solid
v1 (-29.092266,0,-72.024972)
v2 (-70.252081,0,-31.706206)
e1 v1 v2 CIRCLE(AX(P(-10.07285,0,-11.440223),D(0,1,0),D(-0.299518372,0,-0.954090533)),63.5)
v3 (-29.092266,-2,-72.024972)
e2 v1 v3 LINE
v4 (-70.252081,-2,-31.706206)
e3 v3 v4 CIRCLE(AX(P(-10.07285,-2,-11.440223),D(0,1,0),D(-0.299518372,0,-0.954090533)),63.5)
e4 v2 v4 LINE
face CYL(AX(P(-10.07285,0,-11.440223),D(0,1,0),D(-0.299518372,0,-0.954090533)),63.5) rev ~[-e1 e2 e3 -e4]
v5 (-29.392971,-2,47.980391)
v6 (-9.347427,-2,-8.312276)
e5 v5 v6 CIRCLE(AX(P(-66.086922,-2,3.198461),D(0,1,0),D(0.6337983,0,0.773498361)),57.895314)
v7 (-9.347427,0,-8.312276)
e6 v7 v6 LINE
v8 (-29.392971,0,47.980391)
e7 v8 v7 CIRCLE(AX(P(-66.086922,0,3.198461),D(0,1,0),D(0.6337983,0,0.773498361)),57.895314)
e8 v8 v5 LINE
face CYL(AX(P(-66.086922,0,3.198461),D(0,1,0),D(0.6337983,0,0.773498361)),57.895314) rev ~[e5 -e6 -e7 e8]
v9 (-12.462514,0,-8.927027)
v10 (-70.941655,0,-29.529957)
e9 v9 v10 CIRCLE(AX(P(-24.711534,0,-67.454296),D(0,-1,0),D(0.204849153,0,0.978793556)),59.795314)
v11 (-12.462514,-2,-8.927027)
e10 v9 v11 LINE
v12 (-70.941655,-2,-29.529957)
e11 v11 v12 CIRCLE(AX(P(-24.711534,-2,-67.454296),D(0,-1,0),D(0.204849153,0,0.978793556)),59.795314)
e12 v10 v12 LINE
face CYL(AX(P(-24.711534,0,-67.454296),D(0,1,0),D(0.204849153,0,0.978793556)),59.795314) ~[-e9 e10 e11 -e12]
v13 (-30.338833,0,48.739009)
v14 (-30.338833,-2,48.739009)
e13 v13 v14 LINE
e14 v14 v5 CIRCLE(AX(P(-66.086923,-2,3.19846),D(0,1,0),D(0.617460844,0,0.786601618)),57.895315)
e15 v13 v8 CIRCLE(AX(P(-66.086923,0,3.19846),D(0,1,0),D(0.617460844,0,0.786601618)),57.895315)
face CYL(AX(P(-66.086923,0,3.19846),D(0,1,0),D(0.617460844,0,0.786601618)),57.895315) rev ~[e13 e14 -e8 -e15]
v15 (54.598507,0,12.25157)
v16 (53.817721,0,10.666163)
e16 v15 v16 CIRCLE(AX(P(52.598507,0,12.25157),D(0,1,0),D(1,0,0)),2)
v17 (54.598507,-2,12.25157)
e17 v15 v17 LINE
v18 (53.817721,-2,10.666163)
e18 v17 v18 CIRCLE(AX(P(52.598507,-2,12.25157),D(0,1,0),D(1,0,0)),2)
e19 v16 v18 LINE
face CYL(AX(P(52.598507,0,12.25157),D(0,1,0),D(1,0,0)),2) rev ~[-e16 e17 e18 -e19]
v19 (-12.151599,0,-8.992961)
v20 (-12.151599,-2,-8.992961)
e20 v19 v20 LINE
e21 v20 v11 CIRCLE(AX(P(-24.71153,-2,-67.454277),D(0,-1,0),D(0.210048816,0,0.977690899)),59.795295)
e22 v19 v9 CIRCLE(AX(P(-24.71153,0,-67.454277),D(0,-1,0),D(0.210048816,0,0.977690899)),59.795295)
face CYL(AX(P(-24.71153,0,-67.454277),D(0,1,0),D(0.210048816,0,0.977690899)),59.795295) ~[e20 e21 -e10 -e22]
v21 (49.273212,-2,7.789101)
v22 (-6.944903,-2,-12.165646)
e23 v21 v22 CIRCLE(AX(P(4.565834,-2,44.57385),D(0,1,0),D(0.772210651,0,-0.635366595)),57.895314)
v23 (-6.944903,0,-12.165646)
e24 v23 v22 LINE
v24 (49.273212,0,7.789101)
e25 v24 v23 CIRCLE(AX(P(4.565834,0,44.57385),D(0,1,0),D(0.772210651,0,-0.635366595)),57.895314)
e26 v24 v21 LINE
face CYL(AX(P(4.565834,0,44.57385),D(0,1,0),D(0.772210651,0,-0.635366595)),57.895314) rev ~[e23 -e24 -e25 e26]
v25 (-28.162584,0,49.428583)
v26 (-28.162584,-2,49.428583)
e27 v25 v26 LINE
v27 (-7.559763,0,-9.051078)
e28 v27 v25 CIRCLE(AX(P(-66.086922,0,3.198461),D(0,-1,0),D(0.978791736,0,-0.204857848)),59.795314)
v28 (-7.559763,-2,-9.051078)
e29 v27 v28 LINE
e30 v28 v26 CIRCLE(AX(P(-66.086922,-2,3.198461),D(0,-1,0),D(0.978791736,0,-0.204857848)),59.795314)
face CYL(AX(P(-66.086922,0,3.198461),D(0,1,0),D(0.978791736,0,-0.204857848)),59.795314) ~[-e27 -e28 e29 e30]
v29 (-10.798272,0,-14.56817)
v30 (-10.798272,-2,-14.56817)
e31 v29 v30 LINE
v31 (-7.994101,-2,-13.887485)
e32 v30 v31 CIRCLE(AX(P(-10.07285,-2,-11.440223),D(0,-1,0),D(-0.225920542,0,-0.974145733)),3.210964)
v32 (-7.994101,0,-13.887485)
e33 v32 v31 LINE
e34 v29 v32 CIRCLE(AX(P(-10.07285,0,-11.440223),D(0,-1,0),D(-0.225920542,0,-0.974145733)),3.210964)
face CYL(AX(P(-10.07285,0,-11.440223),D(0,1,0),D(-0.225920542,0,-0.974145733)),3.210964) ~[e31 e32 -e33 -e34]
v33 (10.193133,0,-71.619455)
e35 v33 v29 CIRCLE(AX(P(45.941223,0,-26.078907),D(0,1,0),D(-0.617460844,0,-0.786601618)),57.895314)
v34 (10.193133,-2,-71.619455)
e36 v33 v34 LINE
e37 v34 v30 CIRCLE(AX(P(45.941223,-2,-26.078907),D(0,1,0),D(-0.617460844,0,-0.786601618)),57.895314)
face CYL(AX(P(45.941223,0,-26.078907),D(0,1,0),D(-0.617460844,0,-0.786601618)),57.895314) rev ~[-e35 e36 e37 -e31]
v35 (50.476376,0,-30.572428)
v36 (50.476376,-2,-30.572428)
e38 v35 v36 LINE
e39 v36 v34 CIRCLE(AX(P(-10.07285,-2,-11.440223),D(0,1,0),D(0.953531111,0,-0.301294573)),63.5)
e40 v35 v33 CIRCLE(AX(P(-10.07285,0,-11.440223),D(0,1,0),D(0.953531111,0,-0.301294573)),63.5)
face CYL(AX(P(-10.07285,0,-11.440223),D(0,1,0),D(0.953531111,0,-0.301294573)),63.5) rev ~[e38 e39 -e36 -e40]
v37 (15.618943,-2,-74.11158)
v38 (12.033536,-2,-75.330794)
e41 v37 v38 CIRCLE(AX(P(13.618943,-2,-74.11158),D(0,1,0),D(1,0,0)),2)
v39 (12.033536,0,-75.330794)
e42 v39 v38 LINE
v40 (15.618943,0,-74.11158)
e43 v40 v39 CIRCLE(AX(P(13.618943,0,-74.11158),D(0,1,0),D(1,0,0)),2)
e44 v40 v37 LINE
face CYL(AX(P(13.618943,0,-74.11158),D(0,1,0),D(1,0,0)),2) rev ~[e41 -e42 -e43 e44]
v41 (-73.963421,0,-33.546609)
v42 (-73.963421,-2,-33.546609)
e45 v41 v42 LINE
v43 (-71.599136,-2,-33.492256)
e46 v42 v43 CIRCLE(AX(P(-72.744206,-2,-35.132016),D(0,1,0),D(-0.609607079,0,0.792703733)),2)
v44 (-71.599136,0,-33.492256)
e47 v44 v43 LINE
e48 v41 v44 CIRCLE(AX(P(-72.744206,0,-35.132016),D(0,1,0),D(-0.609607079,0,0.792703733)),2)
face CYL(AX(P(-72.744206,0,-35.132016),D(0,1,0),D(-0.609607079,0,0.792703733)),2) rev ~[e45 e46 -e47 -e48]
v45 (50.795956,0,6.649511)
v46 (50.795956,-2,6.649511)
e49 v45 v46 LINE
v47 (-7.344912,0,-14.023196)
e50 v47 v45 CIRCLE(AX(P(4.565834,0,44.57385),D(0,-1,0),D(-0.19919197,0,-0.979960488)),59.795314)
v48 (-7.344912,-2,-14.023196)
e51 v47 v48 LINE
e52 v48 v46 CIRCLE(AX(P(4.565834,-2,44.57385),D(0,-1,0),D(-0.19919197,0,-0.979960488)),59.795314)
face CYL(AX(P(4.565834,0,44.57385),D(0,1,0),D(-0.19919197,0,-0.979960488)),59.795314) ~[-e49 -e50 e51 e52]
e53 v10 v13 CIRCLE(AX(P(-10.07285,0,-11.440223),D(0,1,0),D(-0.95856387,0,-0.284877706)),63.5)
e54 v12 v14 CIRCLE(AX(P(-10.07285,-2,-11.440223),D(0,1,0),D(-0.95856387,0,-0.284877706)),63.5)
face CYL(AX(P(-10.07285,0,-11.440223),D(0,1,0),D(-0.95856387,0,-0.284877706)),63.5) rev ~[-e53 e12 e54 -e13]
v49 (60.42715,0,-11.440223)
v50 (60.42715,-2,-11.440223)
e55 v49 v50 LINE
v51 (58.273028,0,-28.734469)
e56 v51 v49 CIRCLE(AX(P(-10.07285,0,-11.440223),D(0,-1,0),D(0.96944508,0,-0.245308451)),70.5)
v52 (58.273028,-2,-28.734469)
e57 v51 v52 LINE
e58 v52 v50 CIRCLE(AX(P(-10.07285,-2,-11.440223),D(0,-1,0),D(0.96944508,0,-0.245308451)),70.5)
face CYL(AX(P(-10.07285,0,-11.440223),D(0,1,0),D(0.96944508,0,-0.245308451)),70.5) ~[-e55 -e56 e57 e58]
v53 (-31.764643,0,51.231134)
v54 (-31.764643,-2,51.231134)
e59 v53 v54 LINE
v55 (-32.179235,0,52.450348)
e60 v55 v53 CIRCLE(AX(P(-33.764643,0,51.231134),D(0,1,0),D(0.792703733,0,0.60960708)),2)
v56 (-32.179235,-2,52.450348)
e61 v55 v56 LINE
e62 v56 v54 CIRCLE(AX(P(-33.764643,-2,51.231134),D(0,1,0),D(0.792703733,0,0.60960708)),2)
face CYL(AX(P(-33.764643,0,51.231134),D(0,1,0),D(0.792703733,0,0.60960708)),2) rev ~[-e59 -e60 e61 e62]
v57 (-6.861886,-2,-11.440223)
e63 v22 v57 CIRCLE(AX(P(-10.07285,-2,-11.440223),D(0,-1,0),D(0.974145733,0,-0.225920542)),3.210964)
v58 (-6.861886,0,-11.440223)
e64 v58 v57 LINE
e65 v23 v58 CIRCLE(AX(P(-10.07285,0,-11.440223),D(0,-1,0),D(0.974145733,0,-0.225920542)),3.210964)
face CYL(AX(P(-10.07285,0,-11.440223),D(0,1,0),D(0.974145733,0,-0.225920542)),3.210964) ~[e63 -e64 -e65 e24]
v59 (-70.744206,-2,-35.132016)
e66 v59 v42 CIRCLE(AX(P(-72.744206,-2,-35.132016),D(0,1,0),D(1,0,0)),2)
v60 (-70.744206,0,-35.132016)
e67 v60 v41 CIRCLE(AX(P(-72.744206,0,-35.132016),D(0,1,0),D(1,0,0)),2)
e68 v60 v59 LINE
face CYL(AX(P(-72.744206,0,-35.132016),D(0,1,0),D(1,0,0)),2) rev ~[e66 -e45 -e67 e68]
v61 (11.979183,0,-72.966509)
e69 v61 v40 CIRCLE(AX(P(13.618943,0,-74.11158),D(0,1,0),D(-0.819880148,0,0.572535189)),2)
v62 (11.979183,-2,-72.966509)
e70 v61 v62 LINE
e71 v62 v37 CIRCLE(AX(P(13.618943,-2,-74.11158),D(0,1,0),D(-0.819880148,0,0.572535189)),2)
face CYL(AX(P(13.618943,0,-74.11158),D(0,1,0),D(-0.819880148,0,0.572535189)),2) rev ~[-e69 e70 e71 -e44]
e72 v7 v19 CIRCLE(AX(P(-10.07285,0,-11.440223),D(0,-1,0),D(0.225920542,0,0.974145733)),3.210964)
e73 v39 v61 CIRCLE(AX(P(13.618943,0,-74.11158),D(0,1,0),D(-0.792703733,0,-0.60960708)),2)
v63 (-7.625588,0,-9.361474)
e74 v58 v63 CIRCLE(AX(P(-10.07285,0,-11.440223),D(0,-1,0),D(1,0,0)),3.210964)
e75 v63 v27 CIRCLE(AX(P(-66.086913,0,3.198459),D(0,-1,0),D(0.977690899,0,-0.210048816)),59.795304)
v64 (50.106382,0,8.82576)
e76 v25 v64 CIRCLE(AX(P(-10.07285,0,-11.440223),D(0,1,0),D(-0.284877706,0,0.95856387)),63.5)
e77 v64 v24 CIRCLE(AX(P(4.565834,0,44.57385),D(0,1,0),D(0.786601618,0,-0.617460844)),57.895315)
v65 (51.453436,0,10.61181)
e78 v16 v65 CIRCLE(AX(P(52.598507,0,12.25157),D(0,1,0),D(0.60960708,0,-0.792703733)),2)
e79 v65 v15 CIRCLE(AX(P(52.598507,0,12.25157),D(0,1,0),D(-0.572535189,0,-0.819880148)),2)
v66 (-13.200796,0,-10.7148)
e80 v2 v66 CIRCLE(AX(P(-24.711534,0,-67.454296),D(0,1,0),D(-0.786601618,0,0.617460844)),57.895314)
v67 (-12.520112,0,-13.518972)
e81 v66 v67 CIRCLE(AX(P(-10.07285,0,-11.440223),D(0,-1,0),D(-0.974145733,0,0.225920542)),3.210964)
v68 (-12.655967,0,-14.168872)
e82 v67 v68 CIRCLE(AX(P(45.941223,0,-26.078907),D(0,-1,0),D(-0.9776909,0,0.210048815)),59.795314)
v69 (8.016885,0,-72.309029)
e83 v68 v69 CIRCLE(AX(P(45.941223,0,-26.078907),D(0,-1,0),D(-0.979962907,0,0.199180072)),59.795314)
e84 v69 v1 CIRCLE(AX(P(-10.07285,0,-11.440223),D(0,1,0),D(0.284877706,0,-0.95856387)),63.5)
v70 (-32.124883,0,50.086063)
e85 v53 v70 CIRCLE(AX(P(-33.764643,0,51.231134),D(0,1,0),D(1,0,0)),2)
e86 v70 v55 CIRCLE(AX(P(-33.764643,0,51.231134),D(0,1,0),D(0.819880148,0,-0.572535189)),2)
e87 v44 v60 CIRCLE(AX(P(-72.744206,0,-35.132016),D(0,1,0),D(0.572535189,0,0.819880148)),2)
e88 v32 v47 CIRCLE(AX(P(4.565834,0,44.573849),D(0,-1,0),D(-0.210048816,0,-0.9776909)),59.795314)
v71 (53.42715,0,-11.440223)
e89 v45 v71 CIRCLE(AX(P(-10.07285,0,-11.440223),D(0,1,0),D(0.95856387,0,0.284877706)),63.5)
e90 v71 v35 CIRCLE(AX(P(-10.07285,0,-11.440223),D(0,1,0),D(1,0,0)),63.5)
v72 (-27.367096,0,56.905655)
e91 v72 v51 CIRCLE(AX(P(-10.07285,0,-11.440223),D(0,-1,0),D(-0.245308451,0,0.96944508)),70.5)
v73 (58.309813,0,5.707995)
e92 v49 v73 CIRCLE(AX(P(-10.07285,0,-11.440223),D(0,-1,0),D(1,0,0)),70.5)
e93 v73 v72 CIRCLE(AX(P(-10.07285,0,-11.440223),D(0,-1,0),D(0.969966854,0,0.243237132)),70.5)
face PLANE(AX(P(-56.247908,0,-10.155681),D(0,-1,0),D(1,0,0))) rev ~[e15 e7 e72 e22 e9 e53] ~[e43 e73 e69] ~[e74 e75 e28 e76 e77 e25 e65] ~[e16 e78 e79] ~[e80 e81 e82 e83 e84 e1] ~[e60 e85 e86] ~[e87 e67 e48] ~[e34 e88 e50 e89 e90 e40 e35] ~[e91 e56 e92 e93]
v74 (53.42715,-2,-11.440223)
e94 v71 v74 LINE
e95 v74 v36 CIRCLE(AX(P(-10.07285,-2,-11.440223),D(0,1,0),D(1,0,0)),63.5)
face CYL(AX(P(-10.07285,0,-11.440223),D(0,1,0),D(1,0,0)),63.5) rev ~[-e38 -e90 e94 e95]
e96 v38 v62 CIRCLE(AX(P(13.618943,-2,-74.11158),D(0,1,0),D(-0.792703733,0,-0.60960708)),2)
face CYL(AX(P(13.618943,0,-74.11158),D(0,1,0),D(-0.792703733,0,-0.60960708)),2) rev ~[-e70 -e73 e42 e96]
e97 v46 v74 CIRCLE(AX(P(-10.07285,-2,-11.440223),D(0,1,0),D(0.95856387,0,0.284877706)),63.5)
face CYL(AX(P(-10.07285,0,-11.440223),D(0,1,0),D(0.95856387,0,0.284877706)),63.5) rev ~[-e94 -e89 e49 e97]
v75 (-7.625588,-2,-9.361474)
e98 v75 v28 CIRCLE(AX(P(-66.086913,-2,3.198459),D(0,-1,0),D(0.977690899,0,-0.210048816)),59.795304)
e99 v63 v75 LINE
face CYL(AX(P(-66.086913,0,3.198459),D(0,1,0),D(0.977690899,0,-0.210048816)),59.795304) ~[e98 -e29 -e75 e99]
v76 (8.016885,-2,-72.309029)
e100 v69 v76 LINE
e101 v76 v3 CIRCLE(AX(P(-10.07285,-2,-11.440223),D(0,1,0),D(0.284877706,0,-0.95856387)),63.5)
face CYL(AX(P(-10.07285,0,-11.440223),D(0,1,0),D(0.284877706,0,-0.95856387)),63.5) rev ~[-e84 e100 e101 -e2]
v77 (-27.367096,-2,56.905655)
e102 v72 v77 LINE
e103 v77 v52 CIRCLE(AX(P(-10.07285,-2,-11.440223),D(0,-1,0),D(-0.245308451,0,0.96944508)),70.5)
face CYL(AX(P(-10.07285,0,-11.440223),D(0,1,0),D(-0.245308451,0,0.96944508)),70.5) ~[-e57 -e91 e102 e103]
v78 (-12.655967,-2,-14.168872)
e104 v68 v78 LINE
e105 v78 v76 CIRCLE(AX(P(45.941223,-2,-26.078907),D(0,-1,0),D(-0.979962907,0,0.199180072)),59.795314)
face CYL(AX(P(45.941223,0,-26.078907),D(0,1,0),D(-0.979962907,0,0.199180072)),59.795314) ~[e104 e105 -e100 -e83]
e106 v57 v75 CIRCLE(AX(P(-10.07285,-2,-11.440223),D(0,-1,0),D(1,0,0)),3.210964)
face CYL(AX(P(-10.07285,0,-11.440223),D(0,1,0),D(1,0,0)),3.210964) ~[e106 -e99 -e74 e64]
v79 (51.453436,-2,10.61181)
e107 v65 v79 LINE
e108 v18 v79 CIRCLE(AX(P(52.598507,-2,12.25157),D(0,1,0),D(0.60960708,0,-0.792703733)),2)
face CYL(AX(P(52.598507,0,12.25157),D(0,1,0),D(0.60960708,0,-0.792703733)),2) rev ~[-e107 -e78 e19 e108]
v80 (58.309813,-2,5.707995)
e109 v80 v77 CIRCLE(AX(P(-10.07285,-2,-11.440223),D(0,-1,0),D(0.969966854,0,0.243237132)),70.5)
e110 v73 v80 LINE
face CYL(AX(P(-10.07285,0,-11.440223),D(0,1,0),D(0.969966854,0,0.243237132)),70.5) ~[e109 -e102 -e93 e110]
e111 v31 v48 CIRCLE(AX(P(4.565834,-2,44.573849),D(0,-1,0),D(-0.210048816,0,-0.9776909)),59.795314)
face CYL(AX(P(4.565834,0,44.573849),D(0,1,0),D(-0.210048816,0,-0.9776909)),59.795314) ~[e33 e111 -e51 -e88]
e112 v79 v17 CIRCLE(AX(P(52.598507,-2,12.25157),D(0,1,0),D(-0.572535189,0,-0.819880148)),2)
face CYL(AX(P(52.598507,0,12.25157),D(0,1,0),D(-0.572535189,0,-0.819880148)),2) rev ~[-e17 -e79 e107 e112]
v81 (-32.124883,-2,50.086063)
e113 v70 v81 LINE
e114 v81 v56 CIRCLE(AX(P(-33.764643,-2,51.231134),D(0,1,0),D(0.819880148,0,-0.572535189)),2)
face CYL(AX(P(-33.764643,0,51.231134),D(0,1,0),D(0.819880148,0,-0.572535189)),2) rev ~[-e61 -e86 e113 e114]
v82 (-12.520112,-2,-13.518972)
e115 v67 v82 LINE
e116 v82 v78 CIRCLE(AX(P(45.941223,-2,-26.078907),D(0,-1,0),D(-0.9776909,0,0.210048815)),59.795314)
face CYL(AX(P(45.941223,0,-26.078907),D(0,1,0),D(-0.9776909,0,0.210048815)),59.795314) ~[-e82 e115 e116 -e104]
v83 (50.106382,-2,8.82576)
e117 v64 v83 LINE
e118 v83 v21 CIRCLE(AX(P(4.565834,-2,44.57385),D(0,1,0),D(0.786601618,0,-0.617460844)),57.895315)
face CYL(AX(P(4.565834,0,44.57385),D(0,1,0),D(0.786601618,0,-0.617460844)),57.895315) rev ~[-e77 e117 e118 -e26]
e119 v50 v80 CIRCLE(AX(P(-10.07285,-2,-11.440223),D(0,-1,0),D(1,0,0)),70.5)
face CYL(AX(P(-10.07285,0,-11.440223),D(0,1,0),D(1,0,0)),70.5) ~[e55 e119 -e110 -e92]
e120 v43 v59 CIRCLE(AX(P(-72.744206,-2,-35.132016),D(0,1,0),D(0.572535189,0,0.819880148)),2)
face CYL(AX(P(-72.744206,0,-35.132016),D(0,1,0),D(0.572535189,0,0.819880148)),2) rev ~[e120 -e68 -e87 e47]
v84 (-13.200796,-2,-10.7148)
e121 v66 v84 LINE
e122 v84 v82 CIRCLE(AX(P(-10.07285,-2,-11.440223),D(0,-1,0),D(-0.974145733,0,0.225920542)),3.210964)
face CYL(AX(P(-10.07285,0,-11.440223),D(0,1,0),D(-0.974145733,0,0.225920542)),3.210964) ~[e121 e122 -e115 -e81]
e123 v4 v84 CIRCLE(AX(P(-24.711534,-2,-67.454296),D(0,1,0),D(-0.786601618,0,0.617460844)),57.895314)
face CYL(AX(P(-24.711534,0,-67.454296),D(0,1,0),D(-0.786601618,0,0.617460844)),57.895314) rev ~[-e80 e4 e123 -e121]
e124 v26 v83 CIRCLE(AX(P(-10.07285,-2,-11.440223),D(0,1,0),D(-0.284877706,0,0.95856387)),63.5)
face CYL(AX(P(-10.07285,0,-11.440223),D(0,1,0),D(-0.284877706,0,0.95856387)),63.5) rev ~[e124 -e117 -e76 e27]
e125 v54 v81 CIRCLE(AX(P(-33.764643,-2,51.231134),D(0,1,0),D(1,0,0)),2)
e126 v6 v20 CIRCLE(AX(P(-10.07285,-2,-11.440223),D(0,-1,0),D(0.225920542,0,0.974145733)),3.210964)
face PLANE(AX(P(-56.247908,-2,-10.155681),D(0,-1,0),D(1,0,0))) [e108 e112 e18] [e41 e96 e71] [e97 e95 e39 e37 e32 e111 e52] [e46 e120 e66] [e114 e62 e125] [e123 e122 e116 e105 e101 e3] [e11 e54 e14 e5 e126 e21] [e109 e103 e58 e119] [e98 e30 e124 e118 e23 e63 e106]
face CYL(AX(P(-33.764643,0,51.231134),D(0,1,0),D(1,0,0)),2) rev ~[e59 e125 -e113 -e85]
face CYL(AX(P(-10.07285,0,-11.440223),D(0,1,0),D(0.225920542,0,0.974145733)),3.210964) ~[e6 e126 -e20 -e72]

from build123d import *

# Parameters (mm, degrees)
F1_DEPTH = 2


# Not quite as in the source:
# - a feature names something its author has since deleted; it is built from what else it names


with BuildPart() as f1:
    # F0 (on Front) → F1 (new body)
    with BuildSketch(Plane.XZ):
        with BuildLine():
            ThreePointArc((-27.3670955133, 56.9056551345), (-80.5728095325, -11.5155179666), (-27.2210675465, -79.822886236))
            ThreePointArc((-27.2210675465, -79.822886236), (-28.2707166424, -75.9512965825), (-29.0922663621, -72.0249718726))
            ThreePointArc((-29.0922663621, -72.0249718726), (-54.5082769695, -56.802573142), (-70.2520814599, -31.7062061045))
            ThreePointArc((-70.2520814599, -31.7062061045), (-70.6313699985, -32.1947433172), (-71.0054179832, -32.6873044899))
            ThreePointArc((-71.0054179832, -32.6873044899), (-70.0780888504, -33.7565825815), (-69.7442063574, -35.1320161272))
            ThreePointArc((-69.7442063574, -35.1320161272), (-74.7859973818, -37.3299900608), (-72.9649326324, -32.1401471609))
            ThreePointArc((-72.9649326324, -32.1401471609), (-71.9713178078, -30.821081237), (-70.9416554734, -29.5299573821))
            ThreePointArc((-70.9416554734, -29.5299573821), (-66.4396950536, 17.8006515976), (-30.3388328071, 48.7390086816))
            ThreePointArc((-30.3388328071, 48.7390086816), (-30.8273700198, 49.1182972202), (-31.3199311925, 49.4923452049))
            ThreePointArc((-31.3199311925, 49.4923452049), (-36.6541110474, 52.0379628175), (-30.7727738636, 51.4518598542))
            ThreePointArc((-30.7727738636, 51.4518598542), (-29.8904735112, 50.7935939017), (-29.0204405195, 50.1191974536))
            ThreePointArc((-29.0204405195, 50.1191974536), (-28.2798956872, 53.5334090749), (-27.3670955133, 56.9056551345))
        make_face()
        with BuildLine():
            ThreePointArc((-29.0922663621, -72.0249718726), (-28.2707166424, -75.9512965825), (-27.2210675465, -79.822886236))
            ThreePointArc((-27.2210675465, -79.822886236), (26.0907604983, -71.958346724), (58.2730284319, -28.7344688106))
            ThreePointArc((58.2730284319, -28.7344688106), (54.4014575958, -29.7669456779), (50.4763758376, -30.5724283969))
            ThreePointArc((50.4763758376, -30.5724283969), (35.2481065637, -55.9178682056), (10.1931333262, -71.6194547573))
            ThreePointArc((10.1931333262, -71.6194547573), (10.6816705389, -71.9987432958), (11.1742317116, -72.3727912805))
            ThreePointArc((11.1742317116, -72.3727912805), (14.5315947304, -71.2537714989), (16.6189433489, -74.1115796548))
            ThreePointArc((16.6189433489, -74.1115796548), (13.7293813431, -77.1095462072), (10.6270743826, -74.3323059298))
            ThreePointArc((10.6270743826, -74.3323059298), (9.3080084587, -73.3386911051), (8.0168846038, -72.3090287708))
            ThreePointArc((8.0168846038, -72.3090287708), (-10.5589046392, -74.9383627794), (-29.0922663621, -72.0249718726))
        make_face()
        with BuildLine():
            ThreePointArc((58.3098134577, 5.7079947682), (26.0907604983, 49.0779006484), (-27.3670955133, 56.9056551345))
            ThreePointArc((-27.3670955133, 56.9056551345), (-28.2798956872, 53.5334090749), (-29.0204405195, 50.1191974536))
            ThreePointArc((-29.0204405195, 50.1191974536), (-28.589922312, 49.7758651019), (-28.1625840847, 49.4285826951))
            ThreePointArc((-28.1625840847, 49.4285826951), (19.1680248949, 44.9266222753), (50.106381979, 8.8257600288))
            ThreePointArc((50.106381979, 8.8257600288), (50.4856705176, 9.3142972415), (50.8597185023, 9.8068584143))
            ThreePointArc((50.8597185023, 9.8068584143), (51.2230733308, 14.9176875586), (55.5985068765, 12.2515700516))
            ThreePointArc((55.5985068765, 12.2515700516), (54.79648081, 10.2097790271), (52.8192331515, 9.2597010853))
            ThreePointArc((52.8192331515, 9.2597010853), (52.1241754763, 8.329073827), (51.4111721259, 7.4121231804))
            ThreePointArc((51.4111721259, 7.4121231804), (54.8825742735, 6.6494490821), (58.3098134577, 5.7079947682))
        make_face()
        with BuildLine():
            ThreePointArc((50.4763758376, -30.5724283969), (54.4014575958, -29.7669456779), (58.2730284319, -28.7344688106))
            ThreePointArc((58.2730284319, -28.7344688106), (59.886547095, -20.1541655683), (60.4271502595, -11.4402230378))
            ThreePointArc((60.4271502595, -11.4402230378), (59.8958138007, -2.8010030346), (58.3098134577, 5.7079947682))
            ThreePointArc((58.3098134577, 5.7079947682), (54.8825742735, 6.6494490821), (51.4111721259, 7.4121231804))
            ThreePointArc((51.4111721259, 7.4121231804), (51.1051261442, 7.0295570743), (50.7959559925, 6.6495113064))
            ThreePointArc((50.7959559925, 6.6495113064), (52.7659088566, -2.3001782907), (53.4271502595, -11.4402230378))
            ThreePointArc((53.4271502595, -11.4402230378), (52.6851211645, -21.1194320912), (50.4763758376, -30.5724283969))
        make_face()
        with BuildLine():
            ThreePointArc((-12.5201116119, -13.51897209), (-12.5889413468, -13.8437334785), (-12.6559669985, -14.1688719933))
            ThreePointArc((-12.6559669985, -14.1688719933), (-12.4731783685, -13.96568891), (-12.2895816621, -13.7632357104))
            ThreePointArc((-12.2895816621, -13.7632357104), (-12.4080426029, -13.6441201736), (-12.5201116119, -13.51897209))
        make_face()
        with BuildLine():
            ThreePointArc((-12.2895816621, -13.7632357104), (-12.4731783685, -13.96568891), (-12.6559669985, -14.1688719933))
            ThreePointArc((-12.6559669985, -14.1688719933), (-10.3985570941, -46.1115999582), (8.0168846038, -72.3090287708))
            ThreePointArc((8.0168846038, -72.3090287708), (9.1081080721, -71.9740223354), (10.1931333262, -71.6194547573))
            ThreePointArc((10.1931333262, -71.6194547573), (-8.3929341527, -46.0705747238), (-10.7982724135, -14.5681696862))
            ThreePointArc((-10.7982724135, -14.5681696862), (-11.5979884526, -14.2658628235), (-12.2895816621, -13.7632357104))
        make_face()
        with BuildLine():
            ThreePointArc((-70.9416554734, -29.5299573821), (-70.606649038, -30.6211808503), (-70.2520814599, -31.7062061045))
            ThreePointArc((-70.2520814599, -31.7062061045), (-44.7032014264, -13.1201386255), (-13.2007963888, -10.7148003648))
            ThreePointArc((-13.2007963888, -10.7148003648), (-12.862086438, -9.8494851792), (-12.2897757069, -9.1173955477))
            ThreePointArc((-12.2897757069, -9.1173955477), (-12.3762338407, -9.022292149), (-12.4625142647, -8.9270274978))
            ThreePointArc((-12.4625142647, -8.9270274978), (-44.5810834921, -11.0567727884), (-70.9416554734, -29.5299573821))
        make_face()
        with BuildLine():
            ThreePointArc((-71.0054179832, -32.6873044899), (-70.6313699985, -32.1947433172), (-70.2520814599, -31.7062061045))
            ThreePointArc((-70.2520814599, -31.7062061045), (-70.606649038, -30.6211808503), (-70.9416554734, -29.5299573821))
            ThreePointArc((-70.9416554734, -29.5299573821), (-71.9713178078, -30.821081237), (-72.9649326324, -32.1401471609))
            ThreePointArc((-72.9649326324, -32.1401471609), (-71.937377119, -32.2425479097), (-71.0054179832, -32.6873044899))
        make_face()
        with BuildLine():
            ThreePointArc((10.1931333262, -71.6194547573), (9.1081080721, -71.9740223354), (8.0168846038, -72.3090287708))
            ThreePointArc((8.0168846038, -72.3090287708), (9.3080084587, -73.3386911051), (10.6270743826, -74.3323059298))
            ThreePointArc((10.6270743826, -74.3323059298), (10.7294751314, -73.3047504164), (11.1742317116, -72.3727912805))
            ThreePointArc((11.1742317116, -72.3727912805), (10.6816705389, -71.9987432958), (10.1931333262, -71.6194547573))
        make_face()
        with BuildLine():
            ThreePointArc((-28.1625840847, 49.4285826951), (-28.589922312, 49.7758651019), (-29.0204405195, 50.1191974536))
            ThreePointArc((-29.0204405195, 50.1191974536), (-29.1146314874, 49.6144442417), (-29.2050550996, 49.1090025402))
            ThreePointArc((-29.2050550996, 49.1090025402), (-28.6845055424, 49.2710301885), (-28.1625840847, 49.4285826951))
        make_face()
        with BuildLine():
            ThreePointArc((-29.2050550996, 49.1090025402), (-29.1146314874, 49.6144442417), (-29.0204405195, 50.1191974536))
            ThreePointArc((-29.0204405195, 50.1191974536), (-29.8904735112, 50.7935939017), (-30.7727738636, 51.4518598542))
            ThreePointArc((-30.7727738636, 51.4518598542), (-30.7666762774, 51.3415715733), (-30.7646428299, 51.2311335791))
            ThreePointArc((-30.7646428299, 51.2311335791), (-30.9068346739, 50.3184821977), (-31.3199311925, 49.4923452049))
            ThreePointArc((-31.3199311925, 49.4923452049), (-30.8273700198, 49.1182972202), (-30.3388328071, 48.7390086816))
            ThreePointArc((-30.3388328071, 48.7390086816), (-29.7728126001, 48.9266674182), (-29.2050550996, 49.1090025402))
        make_face()
        with BuildLine():
            ThreePointArc((50.7959559925, 6.6495113064), (51.1051261442, 7.0295570743), (51.4111721259, 7.4121231804))
            ThreePointArc((51.4111721259, 7.4121231804), (50.9618140768, 7.4971572567), (50.5118990943, 7.5791935838))
            ThreePointArc((50.5118990943, 7.5791935838), (50.6557066113, 7.1148960249), (50.7959559925, 6.6495113064))
        make_face()
        with BuildLine():
            ThreePointArc((50.5118990943, 7.5791935838), (50.9618140768, 7.4971572567), (51.4111721259, 7.4121231804))
            ThreePointArc((51.4111721259, 7.4121231804), (52.1241754763, 8.329073827), (52.8192331515, 9.2597010853))
            ThreePointArc((52.8192331515, 9.2597010853), (51.7916776381, 9.362101834), (50.8597185023, 9.8068584143))
            ThreePointArc((50.8597185023, 9.8068584143), (50.4856705176, 9.3142972415), (50.106381979, 8.8257600288))
            ThreePointArc((50.106381979, 8.8257600288), (50.3123573205, 8.2035232495), (50.5118990943, 7.5791935838))
        make_face()
        with BuildLine():
            ThreePointArc((-12.5201116119, -13.51897209), (-12.4080426029, -13.6441201736), (-12.2895816621, -13.7632357104))
            ThreePointArc((-12.2895816621, -13.7632357104), (-11.1948099524, -12.5887570771), (-10.0728497405, -11.4402230378))
            ThreePointArc((-10.0728497405, -11.4402230378), (-10.9940718567, -11.2075300608), (-11.9189886514, -10.9899866588))
            ThreePointArc((-11.9189886514, -10.9899866588), (-12.2332943861, -12.2512124569), (-12.5201116119, -13.51897209))
        make_face()
        with BuildLine():
            ThreePointArc((-10.0728497405, -11.4402230378), (-11.1948099524, -12.5887570771), (-12.2895816621, -13.7632357104))
            ThreePointArc((-12.2895816621, -13.7632357104), (-11.5979884526, -14.2658628235), (-10.7982724135, -14.5681696862))
            ThreePointArc((-10.7982724135, -14.5681696862), (-10.6643076305, -13.9264868582), (-10.5230861195, -13.2863619488))
            ThreePointArc((-10.5230861195, -13.2863619488), (-10.5381735464, -13.2824253135), (-10.5532599463, -13.2784847442))
            Line((-10.5532599463, -13.2784847442), (-10.0728497405, -11.4402230378))
        make_face()
        with BuildLine():
            ThreePointArc((-13.2007963888, -10.7148003648), (-13.1931994446, -12.1976568722), (-12.5201116119, -13.51897209))
            ThreePointArc((-12.5201116119, -13.51897209), (-12.2332943861, -12.2512124569), (-11.9189886514, -10.9899866588))
            ThreePointArc((-11.9189886514, -10.9899866588), (-12.5591135608, -10.8487651478), (-13.2007963888, -10.7148003648))
        make_face()
        with BuildLine():
            ThreePointArc((-12.2897757069, -9.1173955477), (-12.862086438, -9.8494851792), (-13.2007963888, -10.7148003648))
            ThreePointArc((-13.2007963888, -10.7148003648), (-12.5591135608, -10.8487651478), (-11.9189886514, -10.9899866588))
            ThreePointArc((-11.9189886514, -10.9899866588), (-11.9150520162, -10.9748992319), (-11.9111114468, -10.9598128319))
            Line((-11.9111114468, -10.9598128319), (-10.0728497405, -11.4402230378))
            ThreePointArc((-10.0728497405, -11.4402230378), (-11.1948573752, -10.2917364213), (-12.2897757069, -9.1173955477))
        make_face()
        with BuildLine():
            ThreePointArc((-69.7442063574, -35.1320161272), (-70.0780888504, -33.7565825815), (-71.0054179832, -32.6873044899))
            ThreePointArc((-71.0054179832, -32.6873044899), (-71.3040153489, -33.088497971), (-71.5991359801, -33.4922558304))
            ThreePointArc((-71.5991359801, -33.4922558304), (-70.9707717301, -34.2073920832), (-70.7442063574, -35.1320161272))
            ThreePointArc((-70.7442063574, -35.1320161272), (-73.6278272269, -36.9262329923), (-73.9634205165, -33.5466086609))
            ThreePointArc((-73.9634205165, -33.5466086609), (-73.469248174, -32.839777435), (-72.9649326324, -32.1401471609))
            ThreePointArc((-72.9649326324, -32.1401471609), (-74.7859973818, -37.3299900608), (-69.7442063574, -35.1320161272))
        make_face()
        with BuildLine():
            ThreePointArc((-71.5991359801, -33.4922558304), (-71.3040153489, -33.088497971), (-71.0054179832, -32.6873044899))
            ThreePointArc((-71.0054179832, -32.6873044899), (-71.937377119, -32.2425479097), (-72.9649326324, -32.1401471609))
            ThreePointArc((-72.9649326324, -32.1401471609), (-73.469248174, -32.839777435), (-73.9634205165, -33.5466086609))
            ThreePointArc((-73.9634205165, -33.5466086609), (-72.7901724606, -33.1325444177), (-71.5991359801, -33.4922558304))
        make_face()
        with BuildLine():
            ThreePointArc((11.1742317116, -72.3727912805), (10.7294751314, -73.3047504164), (10.6270743826, -74.3323059298))
            ThreePointArc((10.6270743826, -74.3323059298), (11.3267046567, -74.8366214714), (12.0335358826, -75.3307938138))
            ThreePointArc((12.0335358826, -75.3307938138), (11.6194716394, -74.1575457579), (11.9791830521, -72.9665092775))
            ThreePointArc((11.9791830521, -72.9665092775), (11.5754251927, -72.6713886463), (11.1742317116, -72.3727912805))
        make_face()
        with BuildLine():
            ThreePointArc((12.0335358826, -75.3307938138), (11.3267046567, -74.8366214714), (10.6270743826, -74.3323059298))
            ThreePointArc((10.6270743826, -74.3323059298), (13.7293813431, -77.1095462072), (16.6189433489, -74.1115796548))
            ThreePointArc((16.6189433489, -74.1115796548), (14.5315947304, -71.2537714989), (11.1742317116, -72.3727912805))
            ThreePointArc((11.1742317116, -72.3727912805), (11.5754251927, -72.6713886463), (11.9791830521, -72.9665092775))
            ThreePointArc((11.9791830521, -72.9665092775), (14.2191430683, -72.2037640723), (15.6189433489, -74.1115796548))
            ThreePointArc((15.6189433489, -74.1115796548), (14.2628319524, -76.0050968758), (12.0335358826, -75.3307938138))
        make_face()
        with BuildLine():
            ThreePointArc((-28.1625840847, 49.4285826951), (-28.6845055424, 49.2710301885), (-29.2050550996, 49.1090025402))
            ThreePointArc((-29.2050550996, 49.1090025402), (-29.3013575877, 48.545087408), (-29.3929706411, 47.9803914774))
            ThreePointArc((-29.3929706411, 47.9803914774), (-11.5464019221, 22.6200733478), (-9.3474270674, -8.3122763895))
            ThreePointArc((-9.3474270674, -8.3122763895), (-8.4819953839, -8.6510527838), (-7.7498370678, -9.2234911162))
            ThreePointArc((-7.7498370678, -9.2234911162), (-7.6548806672, -9.1371958925), (-7.5597630163, -9.051078437))
            ThreePointArc((-7.5597630163, -9.051078437), (-9.6893112365, 23.0677602114), (-28.1625840847, 49.4285826951))
        make_face()
        with BuildLine():
            ThreePointArc((-29.3929706411, 47.9803914774), (-29.3013575877, 48.545087408), (-29.2050550996, 49.1090025402))
            ThreePointArc((-29.2050550996, 49.1090025402), (-29.7728126001, 48.9266674182), (-30.3388328071, 48.7390086816))
            ThreePointArc((-30.3388328071, 48.7390086816), (-29.8639157079, 48.3621762923), (-29.3929706411, 47.9803914774))
        make_face()
        with BuildLine():
            ThreePointArc((-30.7646428299, 51.2311335791), (-30.7666762774, 51.3415715733), (-30.7727738636, 51.4518598542))
            ThreePointArc((-30.7727738636, 51.4518598542), (-31.4724041376, 51.9561753958), (-32.1792353635, 52.4503477382))
            ThreePointArc((-32.1792353635, 52.4503477382), (-31.8711256088, 51.8750221826), (-31.7646428299, 51.2311335791))
            ThreePointArc((-31.7646428299, 51.2311335791), (-31.8568272474, 50.6309338597), (-32.124882533, 50.0860632018))
            ThreePointArc((-32.124882533, 50.0860632018), (-31.7211246736, 49.7909425706), (-31.3199311925, 49.4923452049))
            ThreePointArc((-31.3199311925, 49.4923452049), (-30.9068346739, 50.3184821977), (-30.7646428299, 51.2311335791))
        make_face()
        with BuildLine():
            ThreePointArc((-32.1792353635, 52.4503477382), (-31.4724041376, 51.9561753958), (-30.7727738636, 51.4518598542))
            ThreePointArc((-30.7727738636, 51.4518598542), (-36.6541110474, 52.0379628175), (-31.3199311925, 49.4923452049))
            ThreePointArc((-31.3199311925, 49.4923452049), (-31.7211246736, 49.7909425706), (-32.124882533, 50.0860632018))
            ThreePointArc((-32.124882533, 50.0860632018), (-35.7641145394, 51.185167476), (-32.1792353635, 52.4503477382))
        make_face()
        with BuildLine():
            ThreePointArc((-7.9941006882, -13.8874849093), (-7.6696946098, -13.9562403689), (-7.3449122183, -14.0231956907))
            ThreePointArc((-7.3449122183, -14.0231956907), (-7.5478301275, -13.8405739674), (-7.7500222504, -13.6571490043))
            ThreePointArc((-7.7500222504, -13.6571490043), (-7.8690501416, -13.7755079493), (-7.9941006882, -13.8874849093))
        make_face()
        with BuildLine():
            ThreePointArc((-7.7500222504, -13.6571490043), (-7.5478301275, -13.8405739674), (-7.3449122183, -14.0231956907))
            ThreePointArc((-7.3449122183, -14.0231956907), (24.5981851662, -11.7660519999), (50.7959559925, 6.6495113064))
            ThreePointArc((50.7959559925, 6.6495113064), (50.6557066113, 7.1148960249), (50.5118990943, 7.5791935838))
            ThreePointArc((50.5118990943, 7.5791935838), (49.8930363162, 7.6869831447), (49.2732124019, 7.7891009341))
            ThreePointArc((49.2732124019, 7.7891009341), (23.9320992091, -9.9863481746), (-6.9449030921, -12.1656457109))
            ThreePointArc((-6.9449030921, -12.1656457109), (-7.2472736584, -12.9654797683), (-7.7500222504, -13.6571490043))
        make_face()
        with BuildLine():
            ThreePointArc((49.2732124019, 7.7891009341), (49.8930363162, 7.6869831447), (50.5118990943, 7.5791935838))
            ThreePointArc((50.5118990943, 7.5791935838), (50.3123573205, 8.2035232495), (50.106381979, 8.8257600288))
            ThreePointArc((50.106381979, 8.8257600288), (49.6927740639, 8.3050379491), (49.2732124019, 7.7891009341))
        make_face()
        with BuildLine():
            ThreePointArc((50.8597185023, 9.8068584143), (51.7916776381, 9.362101834), (52.8192331515, 9.2597010853))
            ThreePointArc((52.8192331515, 9.2597010853), (53.0275327482, 9.5460981807), (53.2341325227, 9.8337238948))
            ThreePointArc((53.2341325227, 9.8337238948), (52.1548181767, 9.7912569947), (51.1583297131, 10.2080706662))
            ThreePointArc((51.1583297131, 10.2080706662), (51.0094573534, 10.0071420874), (50.8597185023, 9.8068584143))
        make_face()
        with BuildLine():
            ThreePointArc((53.2341325227, 9.8337238948), (53.0275327482, 9.5460981807), (52.8192331515, 9.2597010853))
            ThreePointArc((52.8192331515, 9.2597010853), (54.79648081, 10.2097790271), (55.5985068765, 12.2515700516))
            ThreePointArc((55.5985068765, 12.2515700516), (51.2230733308, 14.9176875586), (50.8597185023, 9.8068584143))
            ThreePointArc((50.8597185023, 9.8068584143), (51.0094573534, 10.0071420874), (51.1583297131, 10.2080706662))
            ThreePointArc((51.1583297131, 10.2080706662), (51.4475166308, 14.4708540474), (55.0985068765, 12.2515700516))
            ThreePointArc((55.0985068765, 12.2515700516), (54.578287687, 10.7249830274), (53.2341325227, 9.8337238948))
        make_face()
        with BuildLine():
            Line((-9.5924395346, -9.6019613315), (-10.0728497405, -11.4402230378))
            ThreePointArc((-10.0728497405, -11.4402230378), (-8.9243157011, -10.3182628259), (-7.7498370678, -9.2234911162))
            ThreePointArc((-7.7498370678, -9.2234911162), (-8.4819953839, -8.6510527838), (-9.3474270674, -8.3122763895))
            ThreePointArc((-9.3474270674, -8.3122763895), (-9.4813918505, -8.9539592174), (-9.6226133615, -9.5940841269))
            ThreePointArc((-9.6226133615, -9.5940841269), (-9.6075259345, -9.5980207621), (-9.5924395346, -9.6019613315))
        make_face()
        with BuildLine():
            Line((-8.2345880341, -11.9206332437), (-10.0728497405, -11.4402230378))
            ThreePointArc((-10.0728497405, -11.4402230378), (-8.924363124, -12.5622306726), (-7.7500222504, -13.6571490043))
            ThreePointArc((-7.7500222504, -13.6571490043), (-7.2472736584, -12.9654797683), (-6.9449030921, -12.1656457109))
            ThreePointArc((-6.9449030921, -12.1656457109), (-7.5865859201, -12.0316809278), (-8.2267108295, -11.8904594168))
            ThreePointArc((-8.2267108295, -11.8904594168), (-8.2306474647, -11.9055468438), (-8.2345880341, -11.9206332437))
        make_face()
        with BuildLine():
            ThreePointArc((-7.7498370678, -9.2234911162), (-8.9243157011, -10.3182628259), (-10.0728497405, -11.4402230378))
            ThreePointArc((-10.0728497405, -11.4402230378), (-9.1516276243, -11.6729160149), (-8.2267108295, -11.8904594168))
            ThreePointArc((-8.2267108295, -11.8904594168), (-7.9124050948, -10.6292336188), (-7.625587869, -9.3614739856))
            ThreePointArc((-7.625587869, -9.3614739856), (-7.686714869, -9.2915842443), (-7.7498370678, -9.2234911162))
        make_face()
        with BuildLine():
            ThreePointArc((-10.5230861195, -13.2863619488), (-10.3055427175, -12.361445154), (-10.0728497405, -11.4402230378))
            Line((-10.0728497405, -11.4402230378), (-10.5532599463, -13.2784847442))
            ThreePointArc((-10.5532599463, -13.2784847442), (-10.5381735464, -13.2824253135), (-10.5230861195, -13.2863619488))
        make_face()
        with BuildLine():
            ThreePointArc((-12.2897757069, -9.1173955477), (-11.1948573752, -10.2917364213), (-10.0728497405, -11.4402230378))
            ThreePointArc((-10.0728497405, -11.4402230378), (-9.8401567634, -10.5190009216), (-9.6226133615, -9.5940841269))
            ThreePointArc((-9.6226133615, -9.5940841269), (-10.8838391595, -9.2797783922), (-12.1515987927, -8.9929611664))
            ThreePointArc((-12.1515987927, -8.9929611664), (-12.2215881949, -9.0541779116), (-12.2897757069, -9.1173955477))
        make_face()
        with BuildLine():
            ThreePointArc((-8.2267108295, -11.8904594168), (-9.1516276243, -11.6729160149), (-10.0728497405, -11.4402230378))
            Line((-10.0728497405, -11.4402230378), (-8.2345880341, -11.9206332437))
            ThreePointArc((-8.2345880341, -11.9206332437), (-8.2306474647, -11.9055468438), (-8.2267108295, -11.8904594168))
        make_face()
        with BuildLine():
            ThreePointArc((-9.6226133615, -9.5940841269), (-9.8401567634, -10.5190009216), (-10.0728497405, -11.4402230378))
            Line((-10.0728497405, -11.4402230378), (-9.5924395346, -9.6019613315))
            ThreePointArc((-9.5924395346, -9.6019613315), (-9.6075259345, -9.5980207621), (-9.6226133615, -9.5940841269))
        make_face()
        with BuildLine():
            ThreePointArc((-7.7500222504, -13.6571490043), (-8.924363124, -12.5622306726), (-10.0728497405, -11.4402230378))
            ThreePointArc((-10.0728497405, -11.4402230378), (-10.3055427175, -12.361445154), (-10.5230861195, -13.2863619488))
            ThreePointArc((-10.5230861195, -13.2863619488), (-9.2618603214, -13.6006676835), (-7.9941006882, -13.8874849093))
            ThreePointArc((-7.9941006882, -13.8874849093), (-7.8690501416, -13.7755079493), (-7.7500222504, -13.6571490043))
        make_face()
        with BuildLine():
            ThreePointArc((-11.9189886514, -10.9899866588), (-10.9940718567, -11.2075300608), (-10.0728497405, -11.4402230378))
            Line((-10.0728497405, -11.4402230378), (-11.9111114468, -10.9598128319))
            ThreePointArc((-11.9111114468, -10.9598128319), (-11.9150520162, -10.9748992319), (-11.9189886514, -10.9899866588))
        make_face()
        with BuildLine():
            ThreePointArc((-10.5230861195, -13.2863619488), (-10.6643076305, -13.9264868582), (-10.7982724135, -14.5681696862))
            ThreePointArc((-10.7982724135, -14.5681696862), (-9.3154159061, -14.560572742), (-7.9941006882, -13.8874849093))
            ThreePointArc((-7.9941006882, -13.8874849093), (-9.2618603214, -13.6006676835), (-10.5230861195, -13.2863619488))
        make_face()
        with BuildLine():
            ThreePointArc((-12.4625142647, -8.9270274978), (-12.3762338407, -9.022292149), (-12.2897757069, -9.1173955477))
            ThreePointArc((-12.2897757069, -9.1173955477), (-12.2215881949, -9.0541779116), (-12.1515987927, -8.9929611664))
            ThreePointArc((-12.1515987927, -8.9929611664), (-12.3070127215, -8.9597877558), (-12.4625142647, -8.9270274978))
        make_face()
        with BuildLine():
            ThreePointArc((-7.625587869, -9.3614739856), (-7.5924695565, -9.2063198731), (-7.5597630163, -9.051078437))
            ThreePointArc((-7.5597630163, -9.051078437), (-7.6548806672, -9.1371958925), (-7.7498370678, -9.2234911162))
            ThreePointArc((-7.7498370678, -9.2234911162), (-7.686714869, -9.2915842443), (-7.625587869, -9.3614739856))
        make_face()
        with BuildLine():
            ThreePointArc((53.8177210355, 10.6661625852), (53.5276959283, 10.2487029623), (53.2341325227, 9.8337238948))
            ThreePointArc((53.2341325227, 9.8337238948), (54.578287687, 10.7249830274), (55.0985068765, 12.2515700516))
            ThreePointArc((55.0985068765, 12.2515700516), (51.4475166308, 14.4708540474), (51.1583297131, 10.2080706662))
            ThreePointArc((51.1583297131, 10.2080706662), (51.3063190398, 10.4096215716), (51.4534364992, 10.6118097547))
            ThreePointArc((51.4534364992, 10.6118097547), (51.6738828325, 14.0250046789), (54.5985068765, 12.2515700516))
            ThreePointArc((54.5985068765, 12.2515700516), (54.3927237416, 11.3679491821), (53.8177210355, 10.6661625852))
        make_face()
        with BuildLine():
            ThreePointArc((51.1583297131, 10.2080706662), (52.1548181767, 9.7912569947), (53.2341325227, 9.8337238948))
            ThreePointArc((53.2341325227, 9.8337238948), (53.5276959283, 10.2487029623), (53.8177210355, 10.6661625852))
            ThreePointArc((53.8177210355, 10.6661625852), (52.6444729797, 10.252098342), (51.4534364992, 10.6118097547))
            ThreePointArc((51.4534364992, 10.6118097547), (51.3063190398, 10.4096215716), (51.1583297131, 10.2080706662))
        make_face()
        with BuildLine():
            ThreePointArc((-7.625587869, -9.3614739856), (-7.9124050948, -10.6292336188), (-8.2267108295, -11.8904594168))
            ThreePointArc((-8.2267108295, -11.8904594168), (-7.5865859201, -12.0316809278), (-6.9449030921, -12.1656457109))
            ThreePointArc((-6.9449030921, -12.1656457109), (-6.8827077662, -11.8053017608), (-6.8618859771, -11.4402230378))
            ThreePointArc((-6.8618859771, -11.4402230378), (-7.0588526039, -10.3329247264), (-7.625587869, -9.3614739856))
        make_face()
        with BuildLine():
            ThreePointArc((-12.1515987927, -8.9929611664), (-10.8838391595, -9.2797783922), (-9.6226133615, -9.5940841269))
            ThreePointArc((-9.6226133615, -9.5940841269), (-9.4813918505, -8.9539592174), (-9.3474270674, -8.3122763895))
            ThreePointArc((-9.3474270674, -8.3122763895), (-10.8302835749, -8.3198733337), (-12.1515987927, -8.9929611664))
        make_face()
    extrude(amount=F1_DEPTH)


solid = f1.part
